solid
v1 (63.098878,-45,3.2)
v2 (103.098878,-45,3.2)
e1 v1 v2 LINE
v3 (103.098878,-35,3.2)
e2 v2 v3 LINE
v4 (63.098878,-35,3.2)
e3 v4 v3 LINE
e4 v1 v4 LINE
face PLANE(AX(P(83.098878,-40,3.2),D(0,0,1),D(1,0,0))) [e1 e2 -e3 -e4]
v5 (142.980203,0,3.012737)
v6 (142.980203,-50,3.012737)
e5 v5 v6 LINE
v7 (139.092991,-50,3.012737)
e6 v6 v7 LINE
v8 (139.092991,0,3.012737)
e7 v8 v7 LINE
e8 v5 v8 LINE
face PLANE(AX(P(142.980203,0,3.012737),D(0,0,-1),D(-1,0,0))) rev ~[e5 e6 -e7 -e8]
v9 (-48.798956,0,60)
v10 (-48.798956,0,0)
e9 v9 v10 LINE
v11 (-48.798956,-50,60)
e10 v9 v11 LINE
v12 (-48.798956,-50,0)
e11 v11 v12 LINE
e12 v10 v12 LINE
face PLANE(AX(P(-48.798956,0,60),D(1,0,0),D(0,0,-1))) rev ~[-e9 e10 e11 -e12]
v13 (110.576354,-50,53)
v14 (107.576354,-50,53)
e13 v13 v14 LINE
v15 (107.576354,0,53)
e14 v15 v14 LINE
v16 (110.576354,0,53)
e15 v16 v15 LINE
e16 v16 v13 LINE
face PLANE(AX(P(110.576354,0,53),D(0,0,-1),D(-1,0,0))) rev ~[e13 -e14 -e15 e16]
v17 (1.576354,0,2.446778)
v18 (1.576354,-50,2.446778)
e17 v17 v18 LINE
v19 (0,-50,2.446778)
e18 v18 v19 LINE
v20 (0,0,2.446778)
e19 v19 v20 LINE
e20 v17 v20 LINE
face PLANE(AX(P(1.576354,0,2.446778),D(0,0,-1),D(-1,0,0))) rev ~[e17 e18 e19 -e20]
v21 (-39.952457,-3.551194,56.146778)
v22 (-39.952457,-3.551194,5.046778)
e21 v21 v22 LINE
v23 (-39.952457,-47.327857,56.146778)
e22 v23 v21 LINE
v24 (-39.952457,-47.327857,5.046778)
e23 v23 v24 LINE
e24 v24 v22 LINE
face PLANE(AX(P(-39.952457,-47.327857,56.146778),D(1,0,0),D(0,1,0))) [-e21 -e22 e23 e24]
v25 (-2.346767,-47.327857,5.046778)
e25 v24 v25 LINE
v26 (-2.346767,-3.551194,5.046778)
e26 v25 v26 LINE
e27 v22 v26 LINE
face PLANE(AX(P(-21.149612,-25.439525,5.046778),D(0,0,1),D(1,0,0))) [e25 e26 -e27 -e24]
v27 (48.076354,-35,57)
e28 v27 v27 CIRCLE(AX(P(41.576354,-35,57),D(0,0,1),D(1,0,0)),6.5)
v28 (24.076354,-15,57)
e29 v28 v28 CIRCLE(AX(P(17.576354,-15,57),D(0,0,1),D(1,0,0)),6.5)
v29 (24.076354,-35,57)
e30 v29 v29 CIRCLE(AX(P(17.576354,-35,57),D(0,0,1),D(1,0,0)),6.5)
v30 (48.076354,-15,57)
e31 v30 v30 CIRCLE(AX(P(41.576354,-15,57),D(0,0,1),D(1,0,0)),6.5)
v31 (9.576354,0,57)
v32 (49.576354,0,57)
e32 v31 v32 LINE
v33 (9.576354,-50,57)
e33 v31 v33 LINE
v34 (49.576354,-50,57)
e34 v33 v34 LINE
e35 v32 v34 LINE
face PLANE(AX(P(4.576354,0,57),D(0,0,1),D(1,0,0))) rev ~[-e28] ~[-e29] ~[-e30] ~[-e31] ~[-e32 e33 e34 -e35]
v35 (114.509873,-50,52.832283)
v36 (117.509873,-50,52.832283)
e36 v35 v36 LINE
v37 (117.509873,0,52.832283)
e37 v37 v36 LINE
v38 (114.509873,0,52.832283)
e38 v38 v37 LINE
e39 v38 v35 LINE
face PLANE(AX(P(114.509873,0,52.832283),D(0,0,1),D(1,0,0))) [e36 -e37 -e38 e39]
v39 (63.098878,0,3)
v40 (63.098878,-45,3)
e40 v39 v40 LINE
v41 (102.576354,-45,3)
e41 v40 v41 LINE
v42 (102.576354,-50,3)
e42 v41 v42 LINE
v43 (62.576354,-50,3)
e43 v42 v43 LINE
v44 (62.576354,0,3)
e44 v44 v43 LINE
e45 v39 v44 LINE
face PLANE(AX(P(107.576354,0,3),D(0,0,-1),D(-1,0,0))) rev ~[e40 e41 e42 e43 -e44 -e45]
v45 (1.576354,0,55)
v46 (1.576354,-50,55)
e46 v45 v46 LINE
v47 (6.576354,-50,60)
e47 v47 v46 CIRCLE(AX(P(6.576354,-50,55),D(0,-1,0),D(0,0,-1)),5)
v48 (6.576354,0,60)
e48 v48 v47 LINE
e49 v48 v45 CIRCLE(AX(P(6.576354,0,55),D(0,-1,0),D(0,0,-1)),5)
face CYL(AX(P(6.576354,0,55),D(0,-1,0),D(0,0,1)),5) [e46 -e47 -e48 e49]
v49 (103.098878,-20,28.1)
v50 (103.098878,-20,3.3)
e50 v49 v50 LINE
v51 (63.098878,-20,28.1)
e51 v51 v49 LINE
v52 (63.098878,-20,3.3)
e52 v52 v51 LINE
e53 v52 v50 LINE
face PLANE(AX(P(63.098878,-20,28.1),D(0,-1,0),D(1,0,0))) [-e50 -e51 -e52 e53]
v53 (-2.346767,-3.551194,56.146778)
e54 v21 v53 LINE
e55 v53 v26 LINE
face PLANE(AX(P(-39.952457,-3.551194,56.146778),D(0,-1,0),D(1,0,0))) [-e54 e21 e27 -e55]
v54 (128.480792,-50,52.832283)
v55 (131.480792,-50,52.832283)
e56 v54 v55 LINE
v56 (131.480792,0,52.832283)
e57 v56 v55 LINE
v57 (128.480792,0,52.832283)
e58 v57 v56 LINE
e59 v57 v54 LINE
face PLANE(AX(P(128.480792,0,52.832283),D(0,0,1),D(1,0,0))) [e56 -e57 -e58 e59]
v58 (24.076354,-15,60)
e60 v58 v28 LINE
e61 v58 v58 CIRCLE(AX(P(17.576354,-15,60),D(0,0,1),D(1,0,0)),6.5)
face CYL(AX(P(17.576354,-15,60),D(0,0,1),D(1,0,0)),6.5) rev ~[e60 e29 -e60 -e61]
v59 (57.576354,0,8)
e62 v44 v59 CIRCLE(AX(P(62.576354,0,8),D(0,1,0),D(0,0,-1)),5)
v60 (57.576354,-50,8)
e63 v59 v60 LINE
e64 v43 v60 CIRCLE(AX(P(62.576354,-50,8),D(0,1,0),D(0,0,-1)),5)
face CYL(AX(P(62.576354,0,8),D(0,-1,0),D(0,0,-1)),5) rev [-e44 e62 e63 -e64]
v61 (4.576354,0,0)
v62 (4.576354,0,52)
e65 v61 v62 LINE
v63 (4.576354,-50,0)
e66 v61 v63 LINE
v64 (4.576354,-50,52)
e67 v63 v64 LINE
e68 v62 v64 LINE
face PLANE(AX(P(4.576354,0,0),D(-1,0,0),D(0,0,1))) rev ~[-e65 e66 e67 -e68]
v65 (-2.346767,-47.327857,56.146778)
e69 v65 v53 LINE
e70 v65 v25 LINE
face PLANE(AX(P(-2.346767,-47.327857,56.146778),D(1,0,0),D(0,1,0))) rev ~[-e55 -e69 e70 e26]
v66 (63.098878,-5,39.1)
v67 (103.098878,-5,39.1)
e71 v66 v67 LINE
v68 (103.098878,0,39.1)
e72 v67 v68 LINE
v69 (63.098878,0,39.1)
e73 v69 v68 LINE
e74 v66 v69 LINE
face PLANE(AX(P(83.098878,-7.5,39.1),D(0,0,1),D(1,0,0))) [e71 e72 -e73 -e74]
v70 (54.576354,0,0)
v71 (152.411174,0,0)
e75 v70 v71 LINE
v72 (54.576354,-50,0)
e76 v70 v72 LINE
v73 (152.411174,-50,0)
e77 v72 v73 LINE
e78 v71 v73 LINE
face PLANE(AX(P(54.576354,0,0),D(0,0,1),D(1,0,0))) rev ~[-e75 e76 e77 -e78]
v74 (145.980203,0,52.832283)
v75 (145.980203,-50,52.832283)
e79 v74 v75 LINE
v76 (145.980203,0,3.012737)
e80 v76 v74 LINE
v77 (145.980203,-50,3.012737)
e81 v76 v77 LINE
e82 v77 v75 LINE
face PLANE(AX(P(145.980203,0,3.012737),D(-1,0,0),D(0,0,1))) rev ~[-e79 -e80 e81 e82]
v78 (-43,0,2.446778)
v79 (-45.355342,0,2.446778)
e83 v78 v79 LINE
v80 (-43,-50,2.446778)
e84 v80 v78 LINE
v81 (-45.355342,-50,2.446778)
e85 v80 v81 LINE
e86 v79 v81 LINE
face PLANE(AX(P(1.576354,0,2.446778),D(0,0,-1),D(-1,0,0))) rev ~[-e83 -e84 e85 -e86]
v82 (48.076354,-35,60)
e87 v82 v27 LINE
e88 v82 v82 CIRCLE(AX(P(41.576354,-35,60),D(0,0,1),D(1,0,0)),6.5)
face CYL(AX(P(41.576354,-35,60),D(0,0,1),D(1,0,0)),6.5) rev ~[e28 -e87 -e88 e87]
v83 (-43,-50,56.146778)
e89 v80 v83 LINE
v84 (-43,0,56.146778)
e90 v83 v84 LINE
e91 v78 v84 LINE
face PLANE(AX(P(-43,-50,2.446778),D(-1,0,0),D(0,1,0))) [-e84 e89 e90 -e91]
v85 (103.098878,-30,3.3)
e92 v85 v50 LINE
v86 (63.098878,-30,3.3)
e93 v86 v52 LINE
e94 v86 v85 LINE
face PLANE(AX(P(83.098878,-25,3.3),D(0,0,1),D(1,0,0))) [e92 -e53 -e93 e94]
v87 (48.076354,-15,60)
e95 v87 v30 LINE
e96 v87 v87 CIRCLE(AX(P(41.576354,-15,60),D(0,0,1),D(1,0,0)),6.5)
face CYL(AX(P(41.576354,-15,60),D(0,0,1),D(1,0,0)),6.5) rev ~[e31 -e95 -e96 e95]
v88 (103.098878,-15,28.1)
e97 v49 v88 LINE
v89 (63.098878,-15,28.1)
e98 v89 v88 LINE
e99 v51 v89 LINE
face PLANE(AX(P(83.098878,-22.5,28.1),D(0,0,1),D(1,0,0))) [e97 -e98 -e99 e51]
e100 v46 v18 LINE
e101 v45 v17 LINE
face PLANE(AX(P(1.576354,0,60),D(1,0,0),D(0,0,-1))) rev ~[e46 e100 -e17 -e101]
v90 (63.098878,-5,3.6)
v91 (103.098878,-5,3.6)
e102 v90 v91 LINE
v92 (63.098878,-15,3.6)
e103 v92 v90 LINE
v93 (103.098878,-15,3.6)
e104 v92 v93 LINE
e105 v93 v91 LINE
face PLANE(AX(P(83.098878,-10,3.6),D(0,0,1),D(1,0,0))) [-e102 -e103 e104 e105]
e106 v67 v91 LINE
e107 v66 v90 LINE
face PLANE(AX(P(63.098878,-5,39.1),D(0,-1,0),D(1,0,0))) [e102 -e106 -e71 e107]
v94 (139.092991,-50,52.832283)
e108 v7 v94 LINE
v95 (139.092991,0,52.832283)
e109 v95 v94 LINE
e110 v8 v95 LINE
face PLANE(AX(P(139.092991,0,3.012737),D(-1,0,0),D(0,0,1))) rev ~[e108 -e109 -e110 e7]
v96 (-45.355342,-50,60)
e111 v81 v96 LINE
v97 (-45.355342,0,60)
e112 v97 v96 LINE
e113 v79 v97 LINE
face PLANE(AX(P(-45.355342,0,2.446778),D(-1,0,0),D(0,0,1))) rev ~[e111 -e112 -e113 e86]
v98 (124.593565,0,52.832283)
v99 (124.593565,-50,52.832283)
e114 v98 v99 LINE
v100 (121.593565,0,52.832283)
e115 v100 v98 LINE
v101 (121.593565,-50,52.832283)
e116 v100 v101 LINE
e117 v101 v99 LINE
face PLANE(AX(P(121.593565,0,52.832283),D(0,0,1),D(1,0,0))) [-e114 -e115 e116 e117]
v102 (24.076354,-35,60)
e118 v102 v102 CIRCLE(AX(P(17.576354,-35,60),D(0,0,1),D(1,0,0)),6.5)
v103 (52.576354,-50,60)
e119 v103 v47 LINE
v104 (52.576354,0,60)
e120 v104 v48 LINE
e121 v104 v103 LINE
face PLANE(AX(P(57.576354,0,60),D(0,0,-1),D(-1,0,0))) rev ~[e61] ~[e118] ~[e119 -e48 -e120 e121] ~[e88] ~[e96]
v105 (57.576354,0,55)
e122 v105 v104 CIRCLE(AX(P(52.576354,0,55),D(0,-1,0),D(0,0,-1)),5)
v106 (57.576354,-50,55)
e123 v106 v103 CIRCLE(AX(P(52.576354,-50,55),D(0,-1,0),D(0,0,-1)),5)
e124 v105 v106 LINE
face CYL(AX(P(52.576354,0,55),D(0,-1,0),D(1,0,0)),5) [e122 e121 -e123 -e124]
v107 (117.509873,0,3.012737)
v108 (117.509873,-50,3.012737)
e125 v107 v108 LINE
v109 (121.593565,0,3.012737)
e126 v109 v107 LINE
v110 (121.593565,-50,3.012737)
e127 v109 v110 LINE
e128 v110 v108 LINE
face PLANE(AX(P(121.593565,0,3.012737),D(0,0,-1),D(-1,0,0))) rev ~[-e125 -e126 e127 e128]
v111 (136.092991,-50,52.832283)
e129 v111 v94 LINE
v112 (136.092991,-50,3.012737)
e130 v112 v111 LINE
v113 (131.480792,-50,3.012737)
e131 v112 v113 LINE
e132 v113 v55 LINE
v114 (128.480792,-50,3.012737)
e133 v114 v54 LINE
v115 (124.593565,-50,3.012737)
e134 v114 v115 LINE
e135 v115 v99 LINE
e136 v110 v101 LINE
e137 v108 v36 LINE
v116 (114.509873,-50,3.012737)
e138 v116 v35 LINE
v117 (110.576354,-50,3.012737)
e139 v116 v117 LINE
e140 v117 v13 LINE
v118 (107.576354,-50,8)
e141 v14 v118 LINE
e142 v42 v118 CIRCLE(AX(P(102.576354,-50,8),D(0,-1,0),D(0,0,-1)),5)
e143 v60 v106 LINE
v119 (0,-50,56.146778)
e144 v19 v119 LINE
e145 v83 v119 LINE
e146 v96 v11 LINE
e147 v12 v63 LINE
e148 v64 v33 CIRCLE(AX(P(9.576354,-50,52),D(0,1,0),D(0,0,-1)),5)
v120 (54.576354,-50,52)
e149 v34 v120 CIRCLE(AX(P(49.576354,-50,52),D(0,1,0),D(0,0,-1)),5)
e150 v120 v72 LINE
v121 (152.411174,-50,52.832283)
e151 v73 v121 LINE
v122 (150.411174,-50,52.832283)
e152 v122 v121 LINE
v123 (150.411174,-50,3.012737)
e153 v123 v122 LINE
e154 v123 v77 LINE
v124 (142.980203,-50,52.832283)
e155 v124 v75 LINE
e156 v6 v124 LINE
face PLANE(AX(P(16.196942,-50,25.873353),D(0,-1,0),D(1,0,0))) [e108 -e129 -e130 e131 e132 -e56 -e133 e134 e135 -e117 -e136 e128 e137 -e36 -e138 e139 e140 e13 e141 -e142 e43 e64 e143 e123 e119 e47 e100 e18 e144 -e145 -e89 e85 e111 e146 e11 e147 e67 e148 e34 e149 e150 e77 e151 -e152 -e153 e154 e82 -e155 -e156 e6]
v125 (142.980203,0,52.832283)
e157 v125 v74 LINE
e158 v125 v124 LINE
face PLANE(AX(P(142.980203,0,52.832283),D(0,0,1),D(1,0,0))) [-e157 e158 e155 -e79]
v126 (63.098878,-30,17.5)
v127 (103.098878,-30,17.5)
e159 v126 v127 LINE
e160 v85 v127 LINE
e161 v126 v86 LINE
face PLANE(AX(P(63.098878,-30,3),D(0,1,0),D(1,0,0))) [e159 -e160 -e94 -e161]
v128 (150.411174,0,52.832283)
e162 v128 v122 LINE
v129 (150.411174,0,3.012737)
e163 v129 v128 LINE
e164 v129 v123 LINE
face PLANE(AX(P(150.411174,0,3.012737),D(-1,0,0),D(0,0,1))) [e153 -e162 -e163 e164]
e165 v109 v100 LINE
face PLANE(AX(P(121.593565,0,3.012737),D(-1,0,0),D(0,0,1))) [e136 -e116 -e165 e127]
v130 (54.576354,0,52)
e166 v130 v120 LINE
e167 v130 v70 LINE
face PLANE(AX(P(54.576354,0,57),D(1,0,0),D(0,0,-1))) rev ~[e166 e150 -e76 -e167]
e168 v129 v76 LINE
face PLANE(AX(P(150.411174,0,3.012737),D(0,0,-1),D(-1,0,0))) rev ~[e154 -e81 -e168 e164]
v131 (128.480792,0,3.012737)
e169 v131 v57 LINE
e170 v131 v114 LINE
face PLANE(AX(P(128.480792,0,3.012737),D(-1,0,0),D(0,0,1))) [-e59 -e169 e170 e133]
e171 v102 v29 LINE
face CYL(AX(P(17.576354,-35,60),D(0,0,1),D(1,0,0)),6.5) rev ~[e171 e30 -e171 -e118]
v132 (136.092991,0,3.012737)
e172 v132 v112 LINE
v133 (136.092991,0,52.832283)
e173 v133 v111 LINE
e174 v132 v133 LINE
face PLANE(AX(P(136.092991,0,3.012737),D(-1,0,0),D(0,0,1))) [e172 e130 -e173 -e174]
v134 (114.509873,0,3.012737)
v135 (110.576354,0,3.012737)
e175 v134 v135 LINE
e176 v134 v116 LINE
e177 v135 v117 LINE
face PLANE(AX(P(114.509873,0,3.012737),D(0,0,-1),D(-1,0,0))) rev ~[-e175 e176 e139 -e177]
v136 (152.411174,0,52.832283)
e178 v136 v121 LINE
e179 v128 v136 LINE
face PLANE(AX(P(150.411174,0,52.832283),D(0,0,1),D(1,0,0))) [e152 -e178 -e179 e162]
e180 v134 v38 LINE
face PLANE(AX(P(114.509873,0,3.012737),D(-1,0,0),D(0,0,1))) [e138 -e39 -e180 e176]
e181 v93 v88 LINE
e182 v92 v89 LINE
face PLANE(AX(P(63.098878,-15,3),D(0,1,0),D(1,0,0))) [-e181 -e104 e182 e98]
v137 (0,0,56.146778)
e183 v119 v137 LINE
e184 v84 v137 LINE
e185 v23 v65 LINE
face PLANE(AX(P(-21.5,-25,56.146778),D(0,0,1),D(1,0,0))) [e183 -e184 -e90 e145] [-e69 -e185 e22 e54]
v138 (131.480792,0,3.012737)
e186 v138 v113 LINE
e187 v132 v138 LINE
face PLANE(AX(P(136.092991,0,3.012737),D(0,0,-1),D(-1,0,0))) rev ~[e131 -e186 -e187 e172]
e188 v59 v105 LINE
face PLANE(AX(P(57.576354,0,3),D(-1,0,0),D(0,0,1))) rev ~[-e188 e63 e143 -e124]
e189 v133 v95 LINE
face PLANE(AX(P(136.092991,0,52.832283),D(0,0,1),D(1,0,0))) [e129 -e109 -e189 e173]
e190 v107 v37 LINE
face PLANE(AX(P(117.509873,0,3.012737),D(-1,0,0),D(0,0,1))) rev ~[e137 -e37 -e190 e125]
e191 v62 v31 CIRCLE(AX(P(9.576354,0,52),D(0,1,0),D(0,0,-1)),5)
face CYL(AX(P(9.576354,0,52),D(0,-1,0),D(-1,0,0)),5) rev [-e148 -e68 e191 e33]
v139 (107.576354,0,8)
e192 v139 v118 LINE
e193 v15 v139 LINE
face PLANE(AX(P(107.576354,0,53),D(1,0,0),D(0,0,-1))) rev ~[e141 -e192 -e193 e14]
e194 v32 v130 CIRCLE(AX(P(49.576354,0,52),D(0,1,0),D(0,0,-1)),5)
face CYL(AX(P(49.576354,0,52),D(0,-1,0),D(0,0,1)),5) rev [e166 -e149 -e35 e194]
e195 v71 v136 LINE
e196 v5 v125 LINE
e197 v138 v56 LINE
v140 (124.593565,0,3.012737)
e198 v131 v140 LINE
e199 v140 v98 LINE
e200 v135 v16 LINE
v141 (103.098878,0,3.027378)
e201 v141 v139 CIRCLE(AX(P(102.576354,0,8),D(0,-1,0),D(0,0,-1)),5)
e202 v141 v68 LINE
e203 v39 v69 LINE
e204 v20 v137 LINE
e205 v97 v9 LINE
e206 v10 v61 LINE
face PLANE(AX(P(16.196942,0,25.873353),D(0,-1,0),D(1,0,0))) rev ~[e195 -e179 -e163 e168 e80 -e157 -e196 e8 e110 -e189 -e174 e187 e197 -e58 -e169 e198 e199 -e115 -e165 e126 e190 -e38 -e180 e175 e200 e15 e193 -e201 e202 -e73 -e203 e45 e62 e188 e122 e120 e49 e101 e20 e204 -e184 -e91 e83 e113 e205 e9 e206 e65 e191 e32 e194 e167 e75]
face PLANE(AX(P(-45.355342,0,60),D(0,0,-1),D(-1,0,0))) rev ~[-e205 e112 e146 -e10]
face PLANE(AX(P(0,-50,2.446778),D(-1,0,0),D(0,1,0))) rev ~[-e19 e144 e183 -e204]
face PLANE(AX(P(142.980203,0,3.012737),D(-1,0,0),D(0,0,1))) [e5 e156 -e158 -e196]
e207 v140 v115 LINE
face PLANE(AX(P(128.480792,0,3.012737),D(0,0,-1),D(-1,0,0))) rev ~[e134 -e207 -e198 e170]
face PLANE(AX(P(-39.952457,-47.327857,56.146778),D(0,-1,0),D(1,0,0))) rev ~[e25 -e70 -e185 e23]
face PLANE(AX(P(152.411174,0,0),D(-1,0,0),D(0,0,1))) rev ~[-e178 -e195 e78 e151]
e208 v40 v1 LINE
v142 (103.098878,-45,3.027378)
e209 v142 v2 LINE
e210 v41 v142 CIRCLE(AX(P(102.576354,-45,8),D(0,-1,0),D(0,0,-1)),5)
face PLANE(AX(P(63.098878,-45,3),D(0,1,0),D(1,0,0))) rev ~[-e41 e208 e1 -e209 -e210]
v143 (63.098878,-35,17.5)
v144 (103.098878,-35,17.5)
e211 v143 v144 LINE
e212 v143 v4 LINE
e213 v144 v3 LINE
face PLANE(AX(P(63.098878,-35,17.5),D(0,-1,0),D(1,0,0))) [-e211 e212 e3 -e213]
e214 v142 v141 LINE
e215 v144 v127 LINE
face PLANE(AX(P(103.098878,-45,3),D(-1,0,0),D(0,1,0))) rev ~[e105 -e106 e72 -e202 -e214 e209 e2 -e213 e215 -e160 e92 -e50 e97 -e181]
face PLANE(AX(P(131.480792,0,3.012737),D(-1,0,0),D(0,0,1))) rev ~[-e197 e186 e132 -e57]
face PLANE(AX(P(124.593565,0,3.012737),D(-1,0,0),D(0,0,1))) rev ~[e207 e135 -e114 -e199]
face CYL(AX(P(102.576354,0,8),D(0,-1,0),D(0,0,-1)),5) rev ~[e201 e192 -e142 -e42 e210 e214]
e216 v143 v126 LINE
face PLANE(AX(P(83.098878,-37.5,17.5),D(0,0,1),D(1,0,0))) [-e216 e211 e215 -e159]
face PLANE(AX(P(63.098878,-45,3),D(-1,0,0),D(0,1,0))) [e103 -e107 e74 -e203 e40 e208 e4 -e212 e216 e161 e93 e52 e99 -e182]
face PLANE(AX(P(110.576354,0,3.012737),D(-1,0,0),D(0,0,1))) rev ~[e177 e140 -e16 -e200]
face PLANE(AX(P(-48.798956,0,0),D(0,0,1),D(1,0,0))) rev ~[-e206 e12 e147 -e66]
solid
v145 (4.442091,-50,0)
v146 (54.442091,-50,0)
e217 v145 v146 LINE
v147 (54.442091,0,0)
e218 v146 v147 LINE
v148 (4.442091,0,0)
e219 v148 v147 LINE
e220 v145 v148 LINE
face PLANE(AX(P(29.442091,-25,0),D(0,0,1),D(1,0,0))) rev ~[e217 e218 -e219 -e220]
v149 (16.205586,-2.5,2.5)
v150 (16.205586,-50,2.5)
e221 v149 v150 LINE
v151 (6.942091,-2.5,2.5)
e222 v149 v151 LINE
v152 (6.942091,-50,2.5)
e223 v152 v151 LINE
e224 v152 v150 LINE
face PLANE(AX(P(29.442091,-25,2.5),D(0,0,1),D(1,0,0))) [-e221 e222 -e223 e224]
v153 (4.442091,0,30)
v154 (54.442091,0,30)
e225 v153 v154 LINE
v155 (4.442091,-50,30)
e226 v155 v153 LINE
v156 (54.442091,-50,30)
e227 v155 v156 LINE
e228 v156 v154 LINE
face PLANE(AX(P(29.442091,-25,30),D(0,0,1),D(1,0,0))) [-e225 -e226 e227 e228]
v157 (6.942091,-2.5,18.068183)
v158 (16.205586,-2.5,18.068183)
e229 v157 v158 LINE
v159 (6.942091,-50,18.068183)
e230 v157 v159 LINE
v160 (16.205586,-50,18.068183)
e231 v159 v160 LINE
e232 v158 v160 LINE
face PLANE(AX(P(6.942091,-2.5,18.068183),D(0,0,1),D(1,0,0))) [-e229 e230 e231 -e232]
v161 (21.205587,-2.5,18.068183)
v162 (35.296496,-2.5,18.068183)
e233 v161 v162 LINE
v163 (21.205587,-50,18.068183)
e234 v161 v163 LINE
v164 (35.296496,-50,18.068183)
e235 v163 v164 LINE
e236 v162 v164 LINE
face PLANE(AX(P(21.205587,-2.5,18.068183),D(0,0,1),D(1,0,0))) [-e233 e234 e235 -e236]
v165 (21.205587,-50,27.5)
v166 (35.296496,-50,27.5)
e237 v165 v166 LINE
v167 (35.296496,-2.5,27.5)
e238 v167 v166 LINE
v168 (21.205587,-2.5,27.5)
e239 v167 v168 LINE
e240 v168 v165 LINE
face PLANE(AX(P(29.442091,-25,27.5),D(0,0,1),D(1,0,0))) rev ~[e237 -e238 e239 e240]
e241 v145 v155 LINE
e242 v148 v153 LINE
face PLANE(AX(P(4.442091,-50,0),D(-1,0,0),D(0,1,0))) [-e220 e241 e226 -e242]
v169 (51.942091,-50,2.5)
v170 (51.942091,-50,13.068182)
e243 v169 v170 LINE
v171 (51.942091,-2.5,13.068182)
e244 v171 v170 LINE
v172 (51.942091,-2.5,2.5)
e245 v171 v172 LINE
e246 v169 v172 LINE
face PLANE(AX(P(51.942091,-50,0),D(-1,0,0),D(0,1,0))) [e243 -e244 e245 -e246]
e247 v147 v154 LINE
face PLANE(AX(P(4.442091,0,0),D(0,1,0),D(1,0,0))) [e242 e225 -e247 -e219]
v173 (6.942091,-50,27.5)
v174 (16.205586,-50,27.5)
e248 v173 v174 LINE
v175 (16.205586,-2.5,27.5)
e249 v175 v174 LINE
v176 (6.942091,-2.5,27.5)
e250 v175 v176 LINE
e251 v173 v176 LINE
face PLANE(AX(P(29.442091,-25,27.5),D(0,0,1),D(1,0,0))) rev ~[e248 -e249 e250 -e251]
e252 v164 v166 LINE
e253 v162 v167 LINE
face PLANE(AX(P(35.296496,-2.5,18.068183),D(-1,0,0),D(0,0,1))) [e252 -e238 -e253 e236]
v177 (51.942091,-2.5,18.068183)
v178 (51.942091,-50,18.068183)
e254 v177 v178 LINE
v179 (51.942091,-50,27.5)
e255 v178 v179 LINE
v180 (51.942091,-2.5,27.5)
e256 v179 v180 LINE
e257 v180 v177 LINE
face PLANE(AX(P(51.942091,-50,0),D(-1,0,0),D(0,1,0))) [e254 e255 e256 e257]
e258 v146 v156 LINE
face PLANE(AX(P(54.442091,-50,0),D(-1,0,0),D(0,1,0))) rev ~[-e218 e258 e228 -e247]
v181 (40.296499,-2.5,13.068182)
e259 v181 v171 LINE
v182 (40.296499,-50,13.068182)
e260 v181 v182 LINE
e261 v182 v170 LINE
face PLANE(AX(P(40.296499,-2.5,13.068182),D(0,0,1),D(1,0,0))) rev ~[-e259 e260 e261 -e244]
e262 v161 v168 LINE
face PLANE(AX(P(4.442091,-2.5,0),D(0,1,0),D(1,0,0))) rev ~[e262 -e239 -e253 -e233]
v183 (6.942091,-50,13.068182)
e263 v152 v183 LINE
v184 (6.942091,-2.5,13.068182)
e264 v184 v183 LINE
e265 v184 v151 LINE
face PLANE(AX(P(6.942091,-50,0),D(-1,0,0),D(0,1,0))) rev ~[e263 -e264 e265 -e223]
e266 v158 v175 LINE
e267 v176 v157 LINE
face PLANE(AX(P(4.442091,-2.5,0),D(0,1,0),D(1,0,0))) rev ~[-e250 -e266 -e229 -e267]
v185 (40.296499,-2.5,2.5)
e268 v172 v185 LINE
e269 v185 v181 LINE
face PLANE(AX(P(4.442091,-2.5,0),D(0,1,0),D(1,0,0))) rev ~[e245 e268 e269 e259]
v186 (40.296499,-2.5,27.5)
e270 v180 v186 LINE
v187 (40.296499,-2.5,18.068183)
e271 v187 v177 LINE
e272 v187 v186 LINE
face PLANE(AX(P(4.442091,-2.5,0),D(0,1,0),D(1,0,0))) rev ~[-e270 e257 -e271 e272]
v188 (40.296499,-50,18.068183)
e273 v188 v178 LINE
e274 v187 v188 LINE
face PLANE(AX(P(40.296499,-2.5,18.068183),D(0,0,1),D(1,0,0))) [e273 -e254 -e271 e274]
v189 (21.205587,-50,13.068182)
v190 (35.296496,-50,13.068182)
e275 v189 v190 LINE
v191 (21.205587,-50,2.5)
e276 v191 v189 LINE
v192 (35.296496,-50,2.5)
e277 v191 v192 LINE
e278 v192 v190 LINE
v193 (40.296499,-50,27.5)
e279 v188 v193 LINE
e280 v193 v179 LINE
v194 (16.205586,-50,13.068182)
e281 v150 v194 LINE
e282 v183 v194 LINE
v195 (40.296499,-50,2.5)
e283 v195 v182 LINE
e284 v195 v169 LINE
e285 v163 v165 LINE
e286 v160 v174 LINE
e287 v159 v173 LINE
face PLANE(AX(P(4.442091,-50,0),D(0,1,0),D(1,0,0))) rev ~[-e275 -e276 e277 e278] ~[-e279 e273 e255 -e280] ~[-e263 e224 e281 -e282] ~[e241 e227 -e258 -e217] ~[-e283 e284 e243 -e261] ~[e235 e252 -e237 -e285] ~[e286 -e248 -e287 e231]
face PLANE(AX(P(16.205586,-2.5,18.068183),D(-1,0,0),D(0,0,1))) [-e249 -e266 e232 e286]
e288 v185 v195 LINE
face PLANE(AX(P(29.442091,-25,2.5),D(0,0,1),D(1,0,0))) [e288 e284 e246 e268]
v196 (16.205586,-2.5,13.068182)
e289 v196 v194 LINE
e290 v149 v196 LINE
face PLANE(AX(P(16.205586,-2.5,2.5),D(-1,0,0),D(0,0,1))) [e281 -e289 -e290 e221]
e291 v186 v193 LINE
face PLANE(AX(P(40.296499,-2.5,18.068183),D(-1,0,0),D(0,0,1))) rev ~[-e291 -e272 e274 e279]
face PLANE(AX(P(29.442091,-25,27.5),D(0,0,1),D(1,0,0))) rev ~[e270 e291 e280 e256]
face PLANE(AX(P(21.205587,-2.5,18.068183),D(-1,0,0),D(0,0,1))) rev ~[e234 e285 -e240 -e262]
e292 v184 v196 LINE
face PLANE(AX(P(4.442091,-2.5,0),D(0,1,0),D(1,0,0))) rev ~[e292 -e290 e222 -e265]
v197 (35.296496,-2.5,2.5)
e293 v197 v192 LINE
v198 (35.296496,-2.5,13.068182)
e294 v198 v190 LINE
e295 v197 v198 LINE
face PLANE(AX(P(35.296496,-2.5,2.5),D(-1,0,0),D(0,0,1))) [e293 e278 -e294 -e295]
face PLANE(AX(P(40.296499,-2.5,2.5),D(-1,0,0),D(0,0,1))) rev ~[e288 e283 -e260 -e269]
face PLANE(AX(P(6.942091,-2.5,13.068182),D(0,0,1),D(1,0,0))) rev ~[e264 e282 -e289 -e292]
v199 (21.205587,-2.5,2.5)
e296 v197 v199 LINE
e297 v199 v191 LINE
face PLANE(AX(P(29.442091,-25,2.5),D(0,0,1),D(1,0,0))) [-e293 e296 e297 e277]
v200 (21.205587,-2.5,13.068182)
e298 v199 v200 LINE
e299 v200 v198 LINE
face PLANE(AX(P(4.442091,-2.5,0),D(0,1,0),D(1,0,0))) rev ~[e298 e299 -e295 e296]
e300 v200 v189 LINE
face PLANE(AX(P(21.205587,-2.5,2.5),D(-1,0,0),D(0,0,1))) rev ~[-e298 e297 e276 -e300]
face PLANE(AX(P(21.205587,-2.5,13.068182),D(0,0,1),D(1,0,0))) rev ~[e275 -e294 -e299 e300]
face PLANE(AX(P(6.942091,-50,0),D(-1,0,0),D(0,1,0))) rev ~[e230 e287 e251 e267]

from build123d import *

# Parameters (mm, degrees)
F0_W      = 2
F0_H      = 49.8195460532
F0_W_2    = 3
F1_DEPTH  = 50
F4_W      = 40
F4_H      = 15
F5_DEPTH  = 36.1
F6_W      = 40
F6_H      = 10
F7_DEPTH  = 35.5
F8_W      = 40
F8_H      = 15
F9_DEPTH  = 25.1
F10_W     = 40
F10_H     = 10
F11_DEPTH = 24.8
F12_W     = 40
F12_H     = 15
F13_DEPTH = 14.5
F14_W     = 40
F14_H     = 10
F15_DEPTH = 14.3
F16_R     = 5
F3_W      = 50
F3_H      = 50
F17_DEPTH = 30
F18_T     = -2.5
F2_R      = 6.5
F19_DEPTH = 13.9
F20_W     = 43
F20_H     = 50
F21_DEPTH = 53.7
F22_W     = 37.6056898385
F22_H     = 43.7766639516
F23_DEPTH = 51.1
F24_W     = 9.2634954209
F24_H     = 5.0000008196
F24_W_2   = 5.0000008196
F24_H_2   = 9.4318167865
F24_W_3   = 14.0909086913
F24_H_3   = 10.5681823939
F24_W_4   = 5.0000026822
F24_W_5   = 11.6455923861
F25_DEPTH = 47.5


with BuildPart() as f1:
    # F0 (on Front) → F1 (new body)
    with BuildSketch(Plane.XZ):
        Polygon((4.5763543636, 0), (4.5763543636, 57), (54.5763543636, 57), (54.5763543636, 0), (107.5763543636, 0), (107.5763543636, 3), (57.5763543636, 3), (57.5763543636, 60), (1.5763543636, 60), (1.5763543636, 2.4467778858), (-45.3553423285, 2.4467778858), (-45.3553423285, 60), (-48.798955977, 60), (-48.798955977, 0), (-45.3553423285, 0), (1.5763543636, 0), align=None)
        Polygon((107.5763543636, 3), (107.5763543636, 0), (110.5763543636, 0), (152.4111737013, 0), (152.4111737013, 3.0127370264), (150.4111737013, 3.0127370264), (145.9802030325, 3.0127370264), (142.9802030325, 3.0127370264), (139.0929906368, 3.0127370264), (136.0929906368, 3.0127370264), (131.4807920456, 3.0127370264), (128.4807920456, 3.0127370264), (124.5935647488, 3.0127370264), (121.5935647488, 3.0127370264), (117.5098730922, 3.0127370264), (114.5098730922, 3.0127370264), (110.5763543636, 3.0127370264), (110.5763543636, 53), (107.5763543636, 53), align=None)
        with Locations((151.4111737013, 27.922510053)):
            Rectangle(F0_W, F0_H)
        with Locations((144.4802030325, 27.922510053)):
            Rectangle(F0_W_2, F0_H)
        with Locations((116.0098730922, 27.922510053)):
            Rectangle(F0_W_2, F0_H)
        with Locations((137.5929906368, 27.922510053)):
            Rectangle(F0_W_2, F0_H)
        with Locations((123.0935647488, 27.922510053)):
            Rectangle(F0_W_2, F0_H)
        with Locations((129.9807920456, 27.922510053)):
            Rectangle(F0_W_2, F0_H)
    extrude(amount=F1_DEPTH)

    # F4 (on face) → F5 (join)
    with BuildSketch(Plane.XY.offset(3)):
        with Locations((83.0988776684, -7.5)):
            Rectangle(F4_W, F4_H)
    extrude(amount=F5_DEPTH)

    # F6 (on face) → F7 (cut)
    with BuildSketch(Plane.XY.offset(39.1)):
        with Locations((83.0988776684, -10)):
            Rectangle(F6_W, F6_H)
    extrude(amount=-F7_DEPTH, mode=Mode.SUBTRACT)

    # F8 (on face) → F9 (join)
    with BuildSketch(Plane.XY.offset(3)):
        with Locations((83.0988776684, -22.5)):
            Rectangle(F8_W, F8_H)
    extrude(amount=F9_DEPTH)

    # F10 (on face) → F11 (cut)
    with BuildSketch(Plane.XY.offset(28.1)):
        with Locations((83.0988776684, -25)):
            Rectangle(F10_W, F10_H)
    extrude(amount=-F11_DEPTH, mode=Mode.SUBTRACT)

    # F12 (on face) → F13 (join)
    with BuildSketch(Plane.XY.offset(3)):
        with Locations((83.0988776684, -37.5)):
            Rectangle(F12_W, F12_H)
    extrude(amount=F13_DEPTH)

    # F14 (on face) → F15 (cut)
    with BuildSketch(Plane.XY.offset(17.5)):
        with Locations((83.0988776684, -40)):
            Rectangle(F14_W, F14_H)
    extrude(amount=-F15_DEPTH, mode=Mode.SUBTRACT)

    # F16
    f16_edges = [f1.edges().sort_by_distance(p)[0] for p in [
        (57.576354, -25, 60),
        (54.576354, -25, 57),
        (4.576354, -25, 57),
        (57.576354, -25, 3),
        (107.576354, -25, 3),
        (1.576354, -25, 60),
    ]]
    fillet(f16_edges, radius=F16_R)

    # F2 (on face) + F10 (on face) → F19 (cut)
    with BuildSketch(Plane.XY.offset(60)):
        with Locations((17.5763543636, -15)):
            Circle(F2_R)
        with Locations((41.5763543636, -15)):
            Circle(F2_R)
        with Locations((17.5763543636, -35)):
            Circle(F2_R)
        with Locations((41.5763543636, -35)):
            Circle(F2_R)
    with BuildSketch(Plane.XY.offset(28.1)):
        with Locations((83.0988776684, -25)):
            Rectangle(F10_W, F10_H)
    extrude(amount=-F19_DEPTH, mode=Mode.SUBTRACT)

    # F20 (on face) → F21 (join)
    with BuildSketch(Plane.XY.offset(2.4467778858)):
        with Locations((-21.5, -25)):
            Rectangle(F20_W, F20_H)
    extrude(amount=F21_DEPTH)

    # F22 (on face) → F23 (cut)
    with BuildSketch(Plane.XY.offset(56.1467778858)):
        with Locations((-21.1496120319, -25.4395254888)):
            Rectangle(F22_W, F22_H)
    extrude(amount=-F23_DEPTH, mode=Mode.SUBTRACT)


with BuildPart() as f17:
    # F3 (on Top) → F17 (new body)
    with BuildSketch(Plane.XY):
        with Locations((29.4420910721, -25)):
            Rectangle(F3_W, F3_H)
    extrude(amount=F17_DEPTH)

    # F18
    f18_openings = [f17.faces().sort_by_distance(p)[0] for p in [
        (29.442091, -50, 15),
    ]]
    offset(amount=F18_T, openings=f18_openings)

    # F24 (on face) → F25 (join)
    with BuildSketch(Plane.XZ.offset(2.5)):
        with Locations((11.5738387826, 15.5681828037)):
            Rectangle(F24_W, F24_H)
        with Locations((18.7055869028, 22.7840916067)):
            Rectangle(F24_W_2, F24_H_2)
        with Locations((18.7055869028, 15.5681828037)):
            Rectangle(F24_W_2, F24_H)
        with Locations((28.2510416582, 15.5681828037)):
            Rectangle(F24_W_3, F24_H)
        with Locations((18.7055869028, 7.784091197)):
            Rectangle(F24_W_2, F24_H_3)
        with Locations((37.796497345, 22.7840916067)):
            Rectangle(F24_W_4, F24_H_2)
        with Locations((37.796497345, 15.5681828037)):
            Rectangle(F24_W_4, F24_H)
        with Locations((46.1192948791, 15.5681828037)):
            Rectangle(F24_W_5, F24_H)
        with Locations((37.796497345, 7.784091197)):
            Rectangle(F24_W_4, F24_H_3)
    extrude(amount=F25_DEPTH)


solid = Compound([f1.part, f17.part])
